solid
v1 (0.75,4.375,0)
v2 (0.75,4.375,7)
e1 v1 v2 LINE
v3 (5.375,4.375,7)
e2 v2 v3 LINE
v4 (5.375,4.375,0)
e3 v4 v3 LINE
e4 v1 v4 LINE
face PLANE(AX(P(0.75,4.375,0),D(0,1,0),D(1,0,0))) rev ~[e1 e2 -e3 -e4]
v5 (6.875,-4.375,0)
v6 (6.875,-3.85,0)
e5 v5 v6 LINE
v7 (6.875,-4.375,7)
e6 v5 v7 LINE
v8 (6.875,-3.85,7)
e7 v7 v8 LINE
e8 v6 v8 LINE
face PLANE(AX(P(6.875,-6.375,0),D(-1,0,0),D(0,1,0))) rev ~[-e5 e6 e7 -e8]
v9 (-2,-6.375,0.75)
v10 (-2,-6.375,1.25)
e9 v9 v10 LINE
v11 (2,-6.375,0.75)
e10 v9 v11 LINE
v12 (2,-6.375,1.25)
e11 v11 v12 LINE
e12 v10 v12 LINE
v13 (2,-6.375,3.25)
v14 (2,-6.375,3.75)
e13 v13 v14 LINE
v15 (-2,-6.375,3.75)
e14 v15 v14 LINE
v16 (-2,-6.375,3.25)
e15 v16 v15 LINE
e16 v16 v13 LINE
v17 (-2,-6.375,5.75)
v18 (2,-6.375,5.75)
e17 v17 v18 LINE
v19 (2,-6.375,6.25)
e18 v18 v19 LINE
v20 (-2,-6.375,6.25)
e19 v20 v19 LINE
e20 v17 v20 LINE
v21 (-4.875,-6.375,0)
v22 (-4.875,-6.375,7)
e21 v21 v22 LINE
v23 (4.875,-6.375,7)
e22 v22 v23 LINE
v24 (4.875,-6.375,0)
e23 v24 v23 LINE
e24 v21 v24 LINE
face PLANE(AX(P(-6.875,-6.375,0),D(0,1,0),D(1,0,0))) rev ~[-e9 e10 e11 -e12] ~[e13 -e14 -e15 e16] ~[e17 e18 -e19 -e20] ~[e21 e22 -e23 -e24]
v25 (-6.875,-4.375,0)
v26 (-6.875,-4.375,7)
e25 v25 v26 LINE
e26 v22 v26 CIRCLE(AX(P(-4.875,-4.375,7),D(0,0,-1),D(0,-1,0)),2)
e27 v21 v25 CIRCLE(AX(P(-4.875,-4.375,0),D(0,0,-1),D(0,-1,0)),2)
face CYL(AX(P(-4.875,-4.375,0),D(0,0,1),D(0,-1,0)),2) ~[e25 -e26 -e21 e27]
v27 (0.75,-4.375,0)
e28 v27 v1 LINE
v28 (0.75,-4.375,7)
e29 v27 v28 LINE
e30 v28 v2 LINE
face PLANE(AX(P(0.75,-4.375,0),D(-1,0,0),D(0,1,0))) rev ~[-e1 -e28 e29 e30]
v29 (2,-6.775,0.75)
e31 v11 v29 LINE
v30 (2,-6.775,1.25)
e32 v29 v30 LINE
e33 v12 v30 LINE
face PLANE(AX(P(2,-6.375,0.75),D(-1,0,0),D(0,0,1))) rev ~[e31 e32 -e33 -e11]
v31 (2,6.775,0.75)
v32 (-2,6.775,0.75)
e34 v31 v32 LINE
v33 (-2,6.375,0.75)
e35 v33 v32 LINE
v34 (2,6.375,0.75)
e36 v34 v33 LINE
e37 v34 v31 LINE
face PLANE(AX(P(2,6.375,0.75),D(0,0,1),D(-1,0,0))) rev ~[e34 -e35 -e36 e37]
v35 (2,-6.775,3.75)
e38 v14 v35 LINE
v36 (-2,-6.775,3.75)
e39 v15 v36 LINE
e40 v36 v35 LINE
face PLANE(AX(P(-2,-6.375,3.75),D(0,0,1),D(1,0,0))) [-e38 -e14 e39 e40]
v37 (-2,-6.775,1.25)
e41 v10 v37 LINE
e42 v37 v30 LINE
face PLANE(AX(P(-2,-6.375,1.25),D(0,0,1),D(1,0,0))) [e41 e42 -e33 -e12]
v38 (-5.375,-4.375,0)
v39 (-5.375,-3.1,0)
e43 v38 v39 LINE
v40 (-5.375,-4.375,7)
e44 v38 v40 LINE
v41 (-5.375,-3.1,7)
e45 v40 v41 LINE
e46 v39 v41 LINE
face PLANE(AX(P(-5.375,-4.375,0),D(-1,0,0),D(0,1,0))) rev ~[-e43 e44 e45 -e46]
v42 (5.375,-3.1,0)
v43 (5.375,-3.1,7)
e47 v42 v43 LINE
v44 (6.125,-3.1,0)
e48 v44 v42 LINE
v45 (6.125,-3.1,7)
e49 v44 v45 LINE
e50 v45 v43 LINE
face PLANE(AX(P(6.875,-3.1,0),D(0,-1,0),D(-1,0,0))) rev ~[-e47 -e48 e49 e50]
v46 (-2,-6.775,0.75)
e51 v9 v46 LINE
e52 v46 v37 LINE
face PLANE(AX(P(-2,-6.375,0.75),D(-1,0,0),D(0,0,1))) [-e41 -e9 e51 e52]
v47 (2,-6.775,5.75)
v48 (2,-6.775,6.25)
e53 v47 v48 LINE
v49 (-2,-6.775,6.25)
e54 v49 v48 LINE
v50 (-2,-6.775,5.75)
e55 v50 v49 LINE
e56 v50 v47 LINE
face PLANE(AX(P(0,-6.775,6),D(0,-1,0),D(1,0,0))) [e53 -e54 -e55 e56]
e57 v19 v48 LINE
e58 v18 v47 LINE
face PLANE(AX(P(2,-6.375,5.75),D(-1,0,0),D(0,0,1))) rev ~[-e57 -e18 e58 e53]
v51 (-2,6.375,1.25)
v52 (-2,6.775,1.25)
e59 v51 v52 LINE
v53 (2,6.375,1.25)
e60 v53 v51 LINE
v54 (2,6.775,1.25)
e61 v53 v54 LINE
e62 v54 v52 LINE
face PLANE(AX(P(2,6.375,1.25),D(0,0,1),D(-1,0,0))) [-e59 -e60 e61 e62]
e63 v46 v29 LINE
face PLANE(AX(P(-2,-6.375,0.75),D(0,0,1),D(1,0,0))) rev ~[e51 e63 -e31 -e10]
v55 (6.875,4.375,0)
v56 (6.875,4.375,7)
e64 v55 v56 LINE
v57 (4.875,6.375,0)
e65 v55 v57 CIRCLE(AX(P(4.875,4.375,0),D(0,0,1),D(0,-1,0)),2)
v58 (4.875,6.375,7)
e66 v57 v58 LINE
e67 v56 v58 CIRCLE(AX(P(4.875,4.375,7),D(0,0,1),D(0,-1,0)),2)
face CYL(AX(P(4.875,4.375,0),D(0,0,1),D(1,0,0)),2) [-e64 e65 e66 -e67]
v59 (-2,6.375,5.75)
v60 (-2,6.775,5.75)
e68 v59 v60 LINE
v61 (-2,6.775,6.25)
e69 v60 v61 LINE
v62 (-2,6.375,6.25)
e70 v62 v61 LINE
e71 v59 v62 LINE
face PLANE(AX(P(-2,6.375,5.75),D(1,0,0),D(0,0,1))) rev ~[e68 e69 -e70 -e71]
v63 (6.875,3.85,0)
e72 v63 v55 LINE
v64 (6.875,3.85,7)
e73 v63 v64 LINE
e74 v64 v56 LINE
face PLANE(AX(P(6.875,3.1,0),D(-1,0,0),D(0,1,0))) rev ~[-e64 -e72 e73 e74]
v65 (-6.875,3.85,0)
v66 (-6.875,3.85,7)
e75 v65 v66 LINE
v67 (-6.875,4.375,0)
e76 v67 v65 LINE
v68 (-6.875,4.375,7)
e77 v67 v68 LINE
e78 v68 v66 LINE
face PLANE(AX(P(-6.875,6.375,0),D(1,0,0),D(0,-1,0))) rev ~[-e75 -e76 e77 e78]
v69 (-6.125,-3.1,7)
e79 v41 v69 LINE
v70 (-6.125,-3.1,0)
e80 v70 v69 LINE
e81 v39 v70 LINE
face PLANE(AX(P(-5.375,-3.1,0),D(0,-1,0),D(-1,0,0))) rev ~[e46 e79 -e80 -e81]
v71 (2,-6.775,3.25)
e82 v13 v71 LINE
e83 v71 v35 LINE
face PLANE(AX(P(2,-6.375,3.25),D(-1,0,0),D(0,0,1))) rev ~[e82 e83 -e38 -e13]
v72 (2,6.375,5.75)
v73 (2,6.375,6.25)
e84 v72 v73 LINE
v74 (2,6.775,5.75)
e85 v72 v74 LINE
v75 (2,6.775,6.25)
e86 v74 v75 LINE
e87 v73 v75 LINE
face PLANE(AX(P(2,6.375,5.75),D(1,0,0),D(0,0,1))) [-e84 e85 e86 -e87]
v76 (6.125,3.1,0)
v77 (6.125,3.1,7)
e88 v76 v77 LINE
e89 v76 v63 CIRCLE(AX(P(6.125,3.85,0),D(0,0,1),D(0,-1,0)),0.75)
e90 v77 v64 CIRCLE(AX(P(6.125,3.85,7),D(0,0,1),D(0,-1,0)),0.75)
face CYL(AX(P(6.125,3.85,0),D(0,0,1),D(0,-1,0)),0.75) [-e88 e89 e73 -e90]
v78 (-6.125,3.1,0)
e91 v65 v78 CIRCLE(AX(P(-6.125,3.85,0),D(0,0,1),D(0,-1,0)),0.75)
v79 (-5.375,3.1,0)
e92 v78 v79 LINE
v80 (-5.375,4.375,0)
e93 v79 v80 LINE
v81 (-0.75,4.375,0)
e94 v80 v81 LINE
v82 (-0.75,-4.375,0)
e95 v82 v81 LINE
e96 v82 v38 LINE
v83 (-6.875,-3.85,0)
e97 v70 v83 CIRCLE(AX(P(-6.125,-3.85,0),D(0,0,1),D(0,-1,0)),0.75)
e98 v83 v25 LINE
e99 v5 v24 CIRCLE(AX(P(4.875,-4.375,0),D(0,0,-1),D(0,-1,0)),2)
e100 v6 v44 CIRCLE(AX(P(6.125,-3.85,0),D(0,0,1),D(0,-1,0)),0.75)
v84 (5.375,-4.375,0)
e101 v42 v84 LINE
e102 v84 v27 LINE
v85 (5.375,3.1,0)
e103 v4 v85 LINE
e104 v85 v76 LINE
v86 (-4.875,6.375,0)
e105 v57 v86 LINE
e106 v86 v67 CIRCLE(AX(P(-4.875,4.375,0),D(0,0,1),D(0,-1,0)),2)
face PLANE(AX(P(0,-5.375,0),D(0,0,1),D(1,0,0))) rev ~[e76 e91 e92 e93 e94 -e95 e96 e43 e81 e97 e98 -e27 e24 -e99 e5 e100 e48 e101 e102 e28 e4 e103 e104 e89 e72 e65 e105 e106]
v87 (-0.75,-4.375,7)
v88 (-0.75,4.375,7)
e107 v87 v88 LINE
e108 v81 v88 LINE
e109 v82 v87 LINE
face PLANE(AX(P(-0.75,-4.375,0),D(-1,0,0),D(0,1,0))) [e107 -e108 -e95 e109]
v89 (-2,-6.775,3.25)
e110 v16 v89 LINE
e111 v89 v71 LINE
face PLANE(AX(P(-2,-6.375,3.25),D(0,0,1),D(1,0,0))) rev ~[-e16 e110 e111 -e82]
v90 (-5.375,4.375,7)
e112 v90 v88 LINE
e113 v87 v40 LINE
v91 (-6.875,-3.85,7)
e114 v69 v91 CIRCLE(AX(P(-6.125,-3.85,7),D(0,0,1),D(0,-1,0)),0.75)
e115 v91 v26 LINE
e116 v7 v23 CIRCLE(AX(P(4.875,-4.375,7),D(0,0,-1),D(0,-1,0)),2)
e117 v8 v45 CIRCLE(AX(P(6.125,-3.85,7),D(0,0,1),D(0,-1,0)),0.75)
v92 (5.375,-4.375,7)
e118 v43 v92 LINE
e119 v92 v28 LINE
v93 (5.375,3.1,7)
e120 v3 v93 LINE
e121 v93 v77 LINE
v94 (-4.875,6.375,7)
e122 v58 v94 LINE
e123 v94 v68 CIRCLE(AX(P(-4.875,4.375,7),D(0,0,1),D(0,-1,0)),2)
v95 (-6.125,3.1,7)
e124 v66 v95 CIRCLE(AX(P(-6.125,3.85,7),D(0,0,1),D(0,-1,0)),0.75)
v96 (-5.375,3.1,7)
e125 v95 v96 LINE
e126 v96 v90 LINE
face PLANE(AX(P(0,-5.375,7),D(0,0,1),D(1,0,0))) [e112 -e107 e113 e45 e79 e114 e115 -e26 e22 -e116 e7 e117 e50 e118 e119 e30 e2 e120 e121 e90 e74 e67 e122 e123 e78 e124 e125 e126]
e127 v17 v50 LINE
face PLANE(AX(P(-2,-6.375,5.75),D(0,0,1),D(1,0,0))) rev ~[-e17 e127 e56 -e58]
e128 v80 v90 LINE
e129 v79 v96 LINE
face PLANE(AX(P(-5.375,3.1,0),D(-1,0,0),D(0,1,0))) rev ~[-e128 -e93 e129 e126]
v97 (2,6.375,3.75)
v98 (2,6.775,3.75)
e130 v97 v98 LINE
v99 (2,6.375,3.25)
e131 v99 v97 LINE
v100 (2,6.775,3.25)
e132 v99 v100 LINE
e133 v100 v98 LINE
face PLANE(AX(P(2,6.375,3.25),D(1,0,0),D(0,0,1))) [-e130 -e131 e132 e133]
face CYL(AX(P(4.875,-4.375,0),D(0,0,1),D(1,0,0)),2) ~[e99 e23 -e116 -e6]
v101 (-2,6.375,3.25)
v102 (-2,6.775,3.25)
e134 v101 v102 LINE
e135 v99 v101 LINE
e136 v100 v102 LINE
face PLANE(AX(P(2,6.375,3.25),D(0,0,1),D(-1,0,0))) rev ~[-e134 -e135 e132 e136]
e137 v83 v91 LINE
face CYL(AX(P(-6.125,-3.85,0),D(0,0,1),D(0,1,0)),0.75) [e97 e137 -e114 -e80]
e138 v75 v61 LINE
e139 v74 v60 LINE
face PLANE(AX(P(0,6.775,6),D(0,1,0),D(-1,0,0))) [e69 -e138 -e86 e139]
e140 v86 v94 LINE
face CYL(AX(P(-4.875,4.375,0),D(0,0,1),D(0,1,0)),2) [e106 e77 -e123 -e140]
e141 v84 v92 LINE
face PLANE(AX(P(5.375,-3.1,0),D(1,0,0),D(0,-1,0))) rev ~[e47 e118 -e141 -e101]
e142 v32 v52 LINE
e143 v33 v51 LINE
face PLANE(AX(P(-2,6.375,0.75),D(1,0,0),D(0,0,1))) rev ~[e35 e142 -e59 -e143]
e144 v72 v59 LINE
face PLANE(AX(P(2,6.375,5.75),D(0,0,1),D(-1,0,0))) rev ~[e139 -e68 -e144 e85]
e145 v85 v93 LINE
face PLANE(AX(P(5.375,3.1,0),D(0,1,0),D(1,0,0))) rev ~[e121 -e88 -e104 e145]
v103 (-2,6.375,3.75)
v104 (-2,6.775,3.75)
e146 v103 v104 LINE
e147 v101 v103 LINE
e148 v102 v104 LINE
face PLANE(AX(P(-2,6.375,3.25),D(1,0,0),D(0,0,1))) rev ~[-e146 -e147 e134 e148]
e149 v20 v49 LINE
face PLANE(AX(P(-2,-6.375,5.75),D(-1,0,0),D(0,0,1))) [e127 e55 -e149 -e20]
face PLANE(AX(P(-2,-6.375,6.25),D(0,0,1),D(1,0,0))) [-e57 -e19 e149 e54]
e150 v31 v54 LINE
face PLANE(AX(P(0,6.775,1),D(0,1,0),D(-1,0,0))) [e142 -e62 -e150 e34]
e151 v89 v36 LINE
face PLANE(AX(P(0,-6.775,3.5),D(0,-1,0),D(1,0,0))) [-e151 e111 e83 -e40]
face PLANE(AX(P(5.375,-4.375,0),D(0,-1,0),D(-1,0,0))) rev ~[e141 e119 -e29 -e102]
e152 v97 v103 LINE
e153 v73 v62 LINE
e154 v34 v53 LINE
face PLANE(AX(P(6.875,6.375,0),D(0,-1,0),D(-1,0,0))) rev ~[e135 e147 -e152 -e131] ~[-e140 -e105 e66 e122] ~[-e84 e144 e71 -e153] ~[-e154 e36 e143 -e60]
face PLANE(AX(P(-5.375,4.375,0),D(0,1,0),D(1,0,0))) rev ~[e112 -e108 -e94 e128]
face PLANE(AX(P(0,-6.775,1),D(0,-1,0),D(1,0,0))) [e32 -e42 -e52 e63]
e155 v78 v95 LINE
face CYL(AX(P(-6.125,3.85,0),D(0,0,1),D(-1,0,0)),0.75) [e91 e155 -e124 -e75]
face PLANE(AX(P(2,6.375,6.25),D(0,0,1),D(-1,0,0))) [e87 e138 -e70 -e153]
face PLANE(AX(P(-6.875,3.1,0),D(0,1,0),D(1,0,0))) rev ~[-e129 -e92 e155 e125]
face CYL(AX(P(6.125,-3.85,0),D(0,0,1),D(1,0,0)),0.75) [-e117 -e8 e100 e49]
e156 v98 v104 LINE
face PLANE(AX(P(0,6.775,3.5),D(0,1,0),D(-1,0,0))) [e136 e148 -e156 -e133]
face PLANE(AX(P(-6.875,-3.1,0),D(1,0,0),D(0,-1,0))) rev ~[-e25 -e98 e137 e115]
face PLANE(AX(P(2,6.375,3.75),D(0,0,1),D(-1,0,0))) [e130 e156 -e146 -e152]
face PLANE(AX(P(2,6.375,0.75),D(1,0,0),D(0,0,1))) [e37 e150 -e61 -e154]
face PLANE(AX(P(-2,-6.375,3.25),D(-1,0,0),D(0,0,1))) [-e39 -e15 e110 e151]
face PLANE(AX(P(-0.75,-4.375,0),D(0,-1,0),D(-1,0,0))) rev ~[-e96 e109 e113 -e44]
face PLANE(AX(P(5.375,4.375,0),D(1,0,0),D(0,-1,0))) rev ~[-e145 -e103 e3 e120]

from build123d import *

# Parameters (mm, degrees)
F0_W     = 1.5
F0_H     = 8.75
F1_DEPTH = 7
F2_R     = 0.75
F3_R     = 2
F4_W     = 4
F4_H     = 0.5
F5_DEPTH = 0.4
F6_W     = 4
F6_H     = 0.5
F7_DEPTH = 0.4


# Not quite as in the source:
# - a feature names something its author has since deleted; it is built from what else it names


with BuildPart() as f1:
    # F0 (on Top) → F1 (new body)
    with BuildSketch(Plane.XY):
        Polygon((5.375, -4.375), (0.75, -4.375), (-0.75, -4.375), (-5.375, -4.375), (-5.375, -6.375), (5.375, -6.375), align=None)
        Rectangle(F0_W, F0_H)
        Polygon((-0.75, 4.375), (0.75, 4.375), (5.375, 4.375), (5.375, 6.375), (-5.375, 6.375), (-5.375, 4.375), align=None)
        Polygon((5.375, -3.1), (5.375, -4.375), (5.375, -6.375), (6.875, -6.375), (6.875, -3.1), align=None)
        Polygon((-5.375, -6.375), (-5.375, -4.375), (-5.375, -3.1), (-6.875, -3.1), (-6.875, -6.375), align=None)
        Polygon((5.375, 6.375), (5.375, 4.375), (5.375, 3.1), (6.875, 3.1), (6.875, 6.375), align=None)
        Polygon((-5.375, 3.1), (-5.375, 4.375), (-5.375, 6.375), (-6.875, 6.375), (-6.875, 3.1), align=None)
    extrude(amount=F1_DEPTH)

    # F2
    f2_edges = [f1.edges().sort_by_distance(p)[0] for p in [
        (-6.875, 3.1, 3.5),
        (6.875, 3.1, 3.5),
        (6.875, -3.1, 3.5),
        (-6.875, -3.1, 3.5),
    ]]
    fillet(f2_edges, radius=F2_R)

    # F3
    f3_edges = [f1.edges().sort_by_distance(p)[0] for p in [
        (-6.875, -6.375, 3.5),
        (6.875, -6.375, 3.5),
        (6.875, 6.375, 3.5),
        (-6.875, 6.375, 3.5),
    ]]
    fillet(f3_edges, radius=F3_R)

    # F4 (on face) → F5 (join)
    with BuildSketch(Plane(origin=(0, 6.375, 0), x_dir=(-1, 0, 0), z_dir=(0, 1, 0))):
        with Locations((0, 1)):
            Rectangle(F4_W, F4_H)
        with Locations((0, 3.5)):
            Rectangle(F4_W, F4_H)
        with Locations((0, 6)):
            Rectangle(F4_W, F4_H)
    extrude(amount=F5_DEPTH)

    # F6 (on face) → F7 (join)
    with BuildSketch(Plane.XZ.offset(6.375)):
        with Locations((0, 3.5)):
            Rectangle(F6_W, F6_H)
        with Locations((0, 6)):
            Rectangle(F6_W, F6_H)
        with Locations((0, 1)):
            Rectangle(F6_W, F6_H)
    extrude(amount=F7_DEPTH)


solid = f1.part
